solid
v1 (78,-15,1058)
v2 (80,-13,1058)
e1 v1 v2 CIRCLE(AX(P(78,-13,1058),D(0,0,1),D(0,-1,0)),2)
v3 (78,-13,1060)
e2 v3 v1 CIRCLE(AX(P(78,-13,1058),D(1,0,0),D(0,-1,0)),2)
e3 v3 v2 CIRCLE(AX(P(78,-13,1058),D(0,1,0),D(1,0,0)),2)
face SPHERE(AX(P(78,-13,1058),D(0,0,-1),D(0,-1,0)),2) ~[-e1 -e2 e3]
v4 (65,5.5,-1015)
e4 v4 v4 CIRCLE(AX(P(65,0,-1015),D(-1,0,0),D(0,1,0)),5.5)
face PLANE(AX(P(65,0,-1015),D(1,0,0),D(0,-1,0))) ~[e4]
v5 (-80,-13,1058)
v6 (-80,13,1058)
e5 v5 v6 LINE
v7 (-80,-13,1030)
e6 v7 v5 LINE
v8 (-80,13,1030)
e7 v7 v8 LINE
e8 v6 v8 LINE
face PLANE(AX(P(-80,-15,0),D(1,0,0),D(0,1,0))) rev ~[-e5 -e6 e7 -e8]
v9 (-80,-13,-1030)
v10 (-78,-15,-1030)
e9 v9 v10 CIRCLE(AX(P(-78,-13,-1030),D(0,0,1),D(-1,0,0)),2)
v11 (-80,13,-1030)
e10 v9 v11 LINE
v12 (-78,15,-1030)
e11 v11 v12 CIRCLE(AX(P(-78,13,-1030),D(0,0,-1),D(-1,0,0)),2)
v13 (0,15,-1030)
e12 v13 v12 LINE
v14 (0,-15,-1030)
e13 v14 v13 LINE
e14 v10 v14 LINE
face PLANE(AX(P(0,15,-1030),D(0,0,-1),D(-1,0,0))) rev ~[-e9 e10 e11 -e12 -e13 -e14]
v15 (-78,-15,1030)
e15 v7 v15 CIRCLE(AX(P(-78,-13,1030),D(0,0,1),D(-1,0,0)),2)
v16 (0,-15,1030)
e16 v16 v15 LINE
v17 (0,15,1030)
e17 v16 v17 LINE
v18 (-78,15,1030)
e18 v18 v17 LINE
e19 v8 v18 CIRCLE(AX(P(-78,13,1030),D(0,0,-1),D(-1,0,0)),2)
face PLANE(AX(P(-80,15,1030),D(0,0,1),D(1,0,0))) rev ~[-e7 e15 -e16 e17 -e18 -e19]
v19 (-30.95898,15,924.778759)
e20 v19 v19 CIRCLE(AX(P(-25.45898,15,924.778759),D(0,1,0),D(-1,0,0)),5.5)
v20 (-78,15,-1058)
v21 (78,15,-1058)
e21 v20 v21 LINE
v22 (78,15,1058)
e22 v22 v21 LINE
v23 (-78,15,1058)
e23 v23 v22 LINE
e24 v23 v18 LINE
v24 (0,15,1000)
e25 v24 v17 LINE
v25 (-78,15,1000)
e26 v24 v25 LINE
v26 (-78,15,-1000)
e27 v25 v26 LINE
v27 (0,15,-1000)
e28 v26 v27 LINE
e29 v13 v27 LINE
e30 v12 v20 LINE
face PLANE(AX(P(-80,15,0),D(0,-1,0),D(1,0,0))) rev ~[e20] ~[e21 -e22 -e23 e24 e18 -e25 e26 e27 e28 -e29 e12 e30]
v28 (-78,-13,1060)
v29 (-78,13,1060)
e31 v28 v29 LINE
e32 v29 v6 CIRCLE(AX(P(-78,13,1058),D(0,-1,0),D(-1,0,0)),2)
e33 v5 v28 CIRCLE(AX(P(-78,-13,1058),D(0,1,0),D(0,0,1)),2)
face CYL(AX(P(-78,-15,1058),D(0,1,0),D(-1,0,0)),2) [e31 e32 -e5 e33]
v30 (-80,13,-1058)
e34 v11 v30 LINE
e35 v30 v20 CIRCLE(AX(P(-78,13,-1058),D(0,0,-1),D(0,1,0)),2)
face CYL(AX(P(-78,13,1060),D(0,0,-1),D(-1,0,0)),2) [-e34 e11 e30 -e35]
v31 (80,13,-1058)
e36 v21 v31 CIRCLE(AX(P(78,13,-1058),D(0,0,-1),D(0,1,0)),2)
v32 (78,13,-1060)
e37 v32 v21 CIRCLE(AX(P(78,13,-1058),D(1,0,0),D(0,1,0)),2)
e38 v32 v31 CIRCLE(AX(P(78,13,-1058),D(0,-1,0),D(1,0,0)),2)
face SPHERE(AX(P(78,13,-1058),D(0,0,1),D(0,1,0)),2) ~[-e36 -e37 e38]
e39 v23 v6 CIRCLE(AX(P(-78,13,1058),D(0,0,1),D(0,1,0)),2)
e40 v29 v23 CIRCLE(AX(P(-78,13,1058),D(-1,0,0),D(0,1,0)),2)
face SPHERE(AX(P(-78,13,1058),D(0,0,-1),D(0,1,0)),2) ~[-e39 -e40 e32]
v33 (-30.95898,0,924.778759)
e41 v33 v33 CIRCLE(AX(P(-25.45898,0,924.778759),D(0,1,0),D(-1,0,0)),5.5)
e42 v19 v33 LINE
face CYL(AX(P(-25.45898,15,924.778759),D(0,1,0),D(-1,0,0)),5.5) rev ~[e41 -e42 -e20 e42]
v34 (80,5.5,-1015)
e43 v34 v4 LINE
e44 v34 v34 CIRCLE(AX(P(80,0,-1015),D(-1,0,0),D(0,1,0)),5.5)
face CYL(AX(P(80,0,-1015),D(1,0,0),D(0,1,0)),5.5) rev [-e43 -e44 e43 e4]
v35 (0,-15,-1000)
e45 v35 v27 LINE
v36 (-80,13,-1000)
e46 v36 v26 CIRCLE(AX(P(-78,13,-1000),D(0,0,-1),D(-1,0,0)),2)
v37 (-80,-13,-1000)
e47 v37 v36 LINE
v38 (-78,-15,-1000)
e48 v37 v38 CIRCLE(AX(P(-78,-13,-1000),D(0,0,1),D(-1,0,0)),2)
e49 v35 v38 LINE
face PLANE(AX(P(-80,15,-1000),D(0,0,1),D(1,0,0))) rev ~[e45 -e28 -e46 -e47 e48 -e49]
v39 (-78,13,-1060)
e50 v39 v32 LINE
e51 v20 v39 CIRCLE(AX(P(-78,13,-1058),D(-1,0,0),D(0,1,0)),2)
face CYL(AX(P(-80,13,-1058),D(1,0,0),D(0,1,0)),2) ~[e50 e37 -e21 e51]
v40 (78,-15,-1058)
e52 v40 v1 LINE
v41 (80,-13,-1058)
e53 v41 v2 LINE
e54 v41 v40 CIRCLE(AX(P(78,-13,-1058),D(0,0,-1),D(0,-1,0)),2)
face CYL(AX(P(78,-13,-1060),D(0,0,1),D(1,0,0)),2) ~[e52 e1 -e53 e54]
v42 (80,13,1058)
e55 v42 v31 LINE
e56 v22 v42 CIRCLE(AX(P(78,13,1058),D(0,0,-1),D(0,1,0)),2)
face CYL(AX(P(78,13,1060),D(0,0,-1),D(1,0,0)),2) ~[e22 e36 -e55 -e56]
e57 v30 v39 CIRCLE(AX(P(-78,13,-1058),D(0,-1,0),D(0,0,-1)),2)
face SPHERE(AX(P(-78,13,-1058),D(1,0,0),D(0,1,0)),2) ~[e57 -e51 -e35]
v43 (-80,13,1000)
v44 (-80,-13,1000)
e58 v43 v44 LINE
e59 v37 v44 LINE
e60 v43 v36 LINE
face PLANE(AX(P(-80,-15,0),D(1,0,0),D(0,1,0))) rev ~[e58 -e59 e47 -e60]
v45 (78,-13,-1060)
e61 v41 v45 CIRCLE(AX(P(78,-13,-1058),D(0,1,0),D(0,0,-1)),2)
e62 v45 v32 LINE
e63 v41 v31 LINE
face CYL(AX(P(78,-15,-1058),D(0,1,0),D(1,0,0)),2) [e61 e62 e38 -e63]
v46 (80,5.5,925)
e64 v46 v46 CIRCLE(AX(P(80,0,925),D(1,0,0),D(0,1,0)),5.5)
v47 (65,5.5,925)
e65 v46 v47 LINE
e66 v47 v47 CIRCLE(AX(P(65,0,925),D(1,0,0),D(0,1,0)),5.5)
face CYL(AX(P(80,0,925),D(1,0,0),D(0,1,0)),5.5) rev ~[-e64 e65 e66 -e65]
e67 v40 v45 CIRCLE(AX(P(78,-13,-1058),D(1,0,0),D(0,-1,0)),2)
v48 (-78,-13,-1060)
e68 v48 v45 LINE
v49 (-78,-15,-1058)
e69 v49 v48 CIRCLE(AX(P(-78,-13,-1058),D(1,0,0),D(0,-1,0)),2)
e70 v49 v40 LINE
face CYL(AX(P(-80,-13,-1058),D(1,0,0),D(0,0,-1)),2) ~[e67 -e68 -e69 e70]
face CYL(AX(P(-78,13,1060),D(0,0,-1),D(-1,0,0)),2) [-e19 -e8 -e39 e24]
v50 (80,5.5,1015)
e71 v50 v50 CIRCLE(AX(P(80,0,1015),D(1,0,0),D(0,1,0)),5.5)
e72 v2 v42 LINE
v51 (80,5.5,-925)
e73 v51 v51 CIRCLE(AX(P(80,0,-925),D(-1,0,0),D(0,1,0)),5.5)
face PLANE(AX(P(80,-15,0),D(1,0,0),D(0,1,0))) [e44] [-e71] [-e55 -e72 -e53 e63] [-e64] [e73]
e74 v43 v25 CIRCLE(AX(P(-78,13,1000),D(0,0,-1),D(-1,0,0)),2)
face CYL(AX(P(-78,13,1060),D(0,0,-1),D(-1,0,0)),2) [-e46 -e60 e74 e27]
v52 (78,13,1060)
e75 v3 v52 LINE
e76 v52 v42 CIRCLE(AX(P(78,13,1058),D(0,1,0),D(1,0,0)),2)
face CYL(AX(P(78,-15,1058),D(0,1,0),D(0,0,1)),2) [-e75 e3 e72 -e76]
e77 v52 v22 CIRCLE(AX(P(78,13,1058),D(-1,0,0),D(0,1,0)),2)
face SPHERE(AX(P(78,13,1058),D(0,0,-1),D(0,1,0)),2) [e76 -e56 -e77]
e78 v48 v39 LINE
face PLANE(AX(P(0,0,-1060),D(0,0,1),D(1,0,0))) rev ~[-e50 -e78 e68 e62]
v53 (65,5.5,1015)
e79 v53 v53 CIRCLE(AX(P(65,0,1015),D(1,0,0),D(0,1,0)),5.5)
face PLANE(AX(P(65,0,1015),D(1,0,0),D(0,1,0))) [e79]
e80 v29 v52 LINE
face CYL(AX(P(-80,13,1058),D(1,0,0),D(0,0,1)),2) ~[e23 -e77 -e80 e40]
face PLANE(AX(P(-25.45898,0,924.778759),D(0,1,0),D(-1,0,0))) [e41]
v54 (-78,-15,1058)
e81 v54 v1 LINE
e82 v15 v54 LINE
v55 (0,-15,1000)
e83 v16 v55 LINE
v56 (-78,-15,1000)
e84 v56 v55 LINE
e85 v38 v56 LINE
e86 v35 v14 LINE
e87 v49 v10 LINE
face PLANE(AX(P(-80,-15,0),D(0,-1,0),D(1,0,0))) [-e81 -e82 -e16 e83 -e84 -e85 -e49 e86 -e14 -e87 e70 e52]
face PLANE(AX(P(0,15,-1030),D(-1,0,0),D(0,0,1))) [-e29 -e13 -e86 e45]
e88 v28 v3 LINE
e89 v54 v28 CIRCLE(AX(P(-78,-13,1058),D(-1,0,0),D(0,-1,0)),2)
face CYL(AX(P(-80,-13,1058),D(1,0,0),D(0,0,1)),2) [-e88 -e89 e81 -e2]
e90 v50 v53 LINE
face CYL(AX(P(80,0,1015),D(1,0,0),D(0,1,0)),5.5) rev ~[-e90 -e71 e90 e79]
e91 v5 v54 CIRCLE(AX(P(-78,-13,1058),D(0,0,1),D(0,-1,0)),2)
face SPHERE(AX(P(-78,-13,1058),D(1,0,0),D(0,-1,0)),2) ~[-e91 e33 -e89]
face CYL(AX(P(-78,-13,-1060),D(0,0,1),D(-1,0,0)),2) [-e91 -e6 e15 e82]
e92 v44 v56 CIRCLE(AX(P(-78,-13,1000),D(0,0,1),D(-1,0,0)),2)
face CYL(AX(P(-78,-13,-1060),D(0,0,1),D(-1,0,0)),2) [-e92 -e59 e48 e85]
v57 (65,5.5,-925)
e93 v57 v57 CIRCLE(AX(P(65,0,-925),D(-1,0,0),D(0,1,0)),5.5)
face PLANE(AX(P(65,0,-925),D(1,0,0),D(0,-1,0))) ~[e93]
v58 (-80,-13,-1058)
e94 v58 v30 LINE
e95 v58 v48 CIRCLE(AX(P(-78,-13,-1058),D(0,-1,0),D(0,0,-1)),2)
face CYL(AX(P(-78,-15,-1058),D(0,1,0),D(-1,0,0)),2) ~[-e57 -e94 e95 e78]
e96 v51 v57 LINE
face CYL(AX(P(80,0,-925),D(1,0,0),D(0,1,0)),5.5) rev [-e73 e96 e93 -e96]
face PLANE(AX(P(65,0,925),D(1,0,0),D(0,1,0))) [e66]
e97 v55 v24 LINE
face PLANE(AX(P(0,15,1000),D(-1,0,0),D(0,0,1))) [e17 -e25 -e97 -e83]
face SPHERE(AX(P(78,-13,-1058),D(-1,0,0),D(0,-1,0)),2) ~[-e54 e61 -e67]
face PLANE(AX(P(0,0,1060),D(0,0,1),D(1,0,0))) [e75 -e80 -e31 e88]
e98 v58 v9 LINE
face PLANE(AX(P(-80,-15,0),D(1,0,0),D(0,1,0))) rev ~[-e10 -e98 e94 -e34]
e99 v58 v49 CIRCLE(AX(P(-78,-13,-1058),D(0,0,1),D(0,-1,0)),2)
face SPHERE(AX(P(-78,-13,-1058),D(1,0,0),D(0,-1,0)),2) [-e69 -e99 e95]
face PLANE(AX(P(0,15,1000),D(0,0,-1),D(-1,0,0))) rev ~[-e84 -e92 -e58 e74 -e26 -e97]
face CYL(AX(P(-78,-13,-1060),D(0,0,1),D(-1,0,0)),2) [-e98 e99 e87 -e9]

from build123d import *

# Parameters (mm, degrees)
F0_W     = 160
F0_H     = 30
F1_DEPTH = 1060
F2_R     = 2
F3_W     = 2
F3_H     = 30
F3_W_2   = 78
F4_DEPTH = 30.001
F3_W_3   = 80
F3_R     = 5.5
F5_DEPTH = 15
F6_R     = 5.5
F7_DEPTH = 15


# Not quite as in the source:
# - a pattern or mirror of a feature is missing from the dataset's text; its kind, count and spacing are read off the source's solid


with BuildPart() as f1:
    # F0 (on Top) → F1 (new body, symmetric)
    with BuildSketch(Plane.XY):
        Rectangle(F0_W, F0_H)
    extrude(amount=F1_DEPTH, both=True)

    # F2
    f2_edges = [f1.edges().sort_by_distance(p)[0] for p in [
        (0, -15, -1060),
        (80, -15, 0),
        (0, -15, 1060),
        (-80, -15, 0),
        (80, 15, 0),
        (0, 15, -1060),
        (-80, 15, 0),
        (0, 15, 1060),
        (80, 0, 1060),
        (-80, 0, 1060),
        (80, 0, -1060),
        (-80, 0, -1060),
    ]]
    fillet(f2_edges, radius=F2_R)

    # F3 (on face) → F4 (cut, through all)
    with BuildSketch(Plane(origin=(0, 15, 0), x_dir=(-1, 0, 0), z_dir=(0, 1, 0))):
        with Locations((79, 1015)):
            Rectangle(F3_W, F3_H)
        with Locations((39, 1015)):
            Rectangle(F3_W_2, F3_H)
        with Locations((79, -1015)):
            Rectangle(F3_W, F3_H)
        with Locations((39, -1015)):
            Rectangle(F3_W_2, F3_H)
    extrude(amount=-F4_DEPTH, mode=Mode.SUBTRACT)

    # F3 (on face) → F5 (cut)
    with BuildSketch(Plane(origin=(0, 15, 0), x_dir=(-1, 0, 0), z_dir=(0, 1, 0))):
        with Locations((40, 1015)):
            Rectangle(F3_W_3, F3_H)
        with Locations((40, -1015)):
            Rectangle(F3_W_3, F3_H)
        with Locations((25.4589803517, 924.7787594795)):
            Circle(F3_R)
    extrude(amount=-F5_DEPTH, mode=Mode.SUBTRACT)

    # F6 (on face) → F7 (cut)
    with BuildSketch(Plane.YZ.offset(80)):
        with Locations((0, 1015)):
            Circle(F6_R)
        with Locations((0, 925)):
            Circle(F6_R)
    f7 = extrude(amount=-F7_DEPTH, mode=Mode.SUBTRACT)

    # F7_copies: F7 across plane
    add(f7.mirror(Plane(origin=(0, 0, 0), x_dir=(-1, 0, 0), z_dir=(0, 0, -1))), mode=Mode.SUBTRACT)


solid = f1.part
